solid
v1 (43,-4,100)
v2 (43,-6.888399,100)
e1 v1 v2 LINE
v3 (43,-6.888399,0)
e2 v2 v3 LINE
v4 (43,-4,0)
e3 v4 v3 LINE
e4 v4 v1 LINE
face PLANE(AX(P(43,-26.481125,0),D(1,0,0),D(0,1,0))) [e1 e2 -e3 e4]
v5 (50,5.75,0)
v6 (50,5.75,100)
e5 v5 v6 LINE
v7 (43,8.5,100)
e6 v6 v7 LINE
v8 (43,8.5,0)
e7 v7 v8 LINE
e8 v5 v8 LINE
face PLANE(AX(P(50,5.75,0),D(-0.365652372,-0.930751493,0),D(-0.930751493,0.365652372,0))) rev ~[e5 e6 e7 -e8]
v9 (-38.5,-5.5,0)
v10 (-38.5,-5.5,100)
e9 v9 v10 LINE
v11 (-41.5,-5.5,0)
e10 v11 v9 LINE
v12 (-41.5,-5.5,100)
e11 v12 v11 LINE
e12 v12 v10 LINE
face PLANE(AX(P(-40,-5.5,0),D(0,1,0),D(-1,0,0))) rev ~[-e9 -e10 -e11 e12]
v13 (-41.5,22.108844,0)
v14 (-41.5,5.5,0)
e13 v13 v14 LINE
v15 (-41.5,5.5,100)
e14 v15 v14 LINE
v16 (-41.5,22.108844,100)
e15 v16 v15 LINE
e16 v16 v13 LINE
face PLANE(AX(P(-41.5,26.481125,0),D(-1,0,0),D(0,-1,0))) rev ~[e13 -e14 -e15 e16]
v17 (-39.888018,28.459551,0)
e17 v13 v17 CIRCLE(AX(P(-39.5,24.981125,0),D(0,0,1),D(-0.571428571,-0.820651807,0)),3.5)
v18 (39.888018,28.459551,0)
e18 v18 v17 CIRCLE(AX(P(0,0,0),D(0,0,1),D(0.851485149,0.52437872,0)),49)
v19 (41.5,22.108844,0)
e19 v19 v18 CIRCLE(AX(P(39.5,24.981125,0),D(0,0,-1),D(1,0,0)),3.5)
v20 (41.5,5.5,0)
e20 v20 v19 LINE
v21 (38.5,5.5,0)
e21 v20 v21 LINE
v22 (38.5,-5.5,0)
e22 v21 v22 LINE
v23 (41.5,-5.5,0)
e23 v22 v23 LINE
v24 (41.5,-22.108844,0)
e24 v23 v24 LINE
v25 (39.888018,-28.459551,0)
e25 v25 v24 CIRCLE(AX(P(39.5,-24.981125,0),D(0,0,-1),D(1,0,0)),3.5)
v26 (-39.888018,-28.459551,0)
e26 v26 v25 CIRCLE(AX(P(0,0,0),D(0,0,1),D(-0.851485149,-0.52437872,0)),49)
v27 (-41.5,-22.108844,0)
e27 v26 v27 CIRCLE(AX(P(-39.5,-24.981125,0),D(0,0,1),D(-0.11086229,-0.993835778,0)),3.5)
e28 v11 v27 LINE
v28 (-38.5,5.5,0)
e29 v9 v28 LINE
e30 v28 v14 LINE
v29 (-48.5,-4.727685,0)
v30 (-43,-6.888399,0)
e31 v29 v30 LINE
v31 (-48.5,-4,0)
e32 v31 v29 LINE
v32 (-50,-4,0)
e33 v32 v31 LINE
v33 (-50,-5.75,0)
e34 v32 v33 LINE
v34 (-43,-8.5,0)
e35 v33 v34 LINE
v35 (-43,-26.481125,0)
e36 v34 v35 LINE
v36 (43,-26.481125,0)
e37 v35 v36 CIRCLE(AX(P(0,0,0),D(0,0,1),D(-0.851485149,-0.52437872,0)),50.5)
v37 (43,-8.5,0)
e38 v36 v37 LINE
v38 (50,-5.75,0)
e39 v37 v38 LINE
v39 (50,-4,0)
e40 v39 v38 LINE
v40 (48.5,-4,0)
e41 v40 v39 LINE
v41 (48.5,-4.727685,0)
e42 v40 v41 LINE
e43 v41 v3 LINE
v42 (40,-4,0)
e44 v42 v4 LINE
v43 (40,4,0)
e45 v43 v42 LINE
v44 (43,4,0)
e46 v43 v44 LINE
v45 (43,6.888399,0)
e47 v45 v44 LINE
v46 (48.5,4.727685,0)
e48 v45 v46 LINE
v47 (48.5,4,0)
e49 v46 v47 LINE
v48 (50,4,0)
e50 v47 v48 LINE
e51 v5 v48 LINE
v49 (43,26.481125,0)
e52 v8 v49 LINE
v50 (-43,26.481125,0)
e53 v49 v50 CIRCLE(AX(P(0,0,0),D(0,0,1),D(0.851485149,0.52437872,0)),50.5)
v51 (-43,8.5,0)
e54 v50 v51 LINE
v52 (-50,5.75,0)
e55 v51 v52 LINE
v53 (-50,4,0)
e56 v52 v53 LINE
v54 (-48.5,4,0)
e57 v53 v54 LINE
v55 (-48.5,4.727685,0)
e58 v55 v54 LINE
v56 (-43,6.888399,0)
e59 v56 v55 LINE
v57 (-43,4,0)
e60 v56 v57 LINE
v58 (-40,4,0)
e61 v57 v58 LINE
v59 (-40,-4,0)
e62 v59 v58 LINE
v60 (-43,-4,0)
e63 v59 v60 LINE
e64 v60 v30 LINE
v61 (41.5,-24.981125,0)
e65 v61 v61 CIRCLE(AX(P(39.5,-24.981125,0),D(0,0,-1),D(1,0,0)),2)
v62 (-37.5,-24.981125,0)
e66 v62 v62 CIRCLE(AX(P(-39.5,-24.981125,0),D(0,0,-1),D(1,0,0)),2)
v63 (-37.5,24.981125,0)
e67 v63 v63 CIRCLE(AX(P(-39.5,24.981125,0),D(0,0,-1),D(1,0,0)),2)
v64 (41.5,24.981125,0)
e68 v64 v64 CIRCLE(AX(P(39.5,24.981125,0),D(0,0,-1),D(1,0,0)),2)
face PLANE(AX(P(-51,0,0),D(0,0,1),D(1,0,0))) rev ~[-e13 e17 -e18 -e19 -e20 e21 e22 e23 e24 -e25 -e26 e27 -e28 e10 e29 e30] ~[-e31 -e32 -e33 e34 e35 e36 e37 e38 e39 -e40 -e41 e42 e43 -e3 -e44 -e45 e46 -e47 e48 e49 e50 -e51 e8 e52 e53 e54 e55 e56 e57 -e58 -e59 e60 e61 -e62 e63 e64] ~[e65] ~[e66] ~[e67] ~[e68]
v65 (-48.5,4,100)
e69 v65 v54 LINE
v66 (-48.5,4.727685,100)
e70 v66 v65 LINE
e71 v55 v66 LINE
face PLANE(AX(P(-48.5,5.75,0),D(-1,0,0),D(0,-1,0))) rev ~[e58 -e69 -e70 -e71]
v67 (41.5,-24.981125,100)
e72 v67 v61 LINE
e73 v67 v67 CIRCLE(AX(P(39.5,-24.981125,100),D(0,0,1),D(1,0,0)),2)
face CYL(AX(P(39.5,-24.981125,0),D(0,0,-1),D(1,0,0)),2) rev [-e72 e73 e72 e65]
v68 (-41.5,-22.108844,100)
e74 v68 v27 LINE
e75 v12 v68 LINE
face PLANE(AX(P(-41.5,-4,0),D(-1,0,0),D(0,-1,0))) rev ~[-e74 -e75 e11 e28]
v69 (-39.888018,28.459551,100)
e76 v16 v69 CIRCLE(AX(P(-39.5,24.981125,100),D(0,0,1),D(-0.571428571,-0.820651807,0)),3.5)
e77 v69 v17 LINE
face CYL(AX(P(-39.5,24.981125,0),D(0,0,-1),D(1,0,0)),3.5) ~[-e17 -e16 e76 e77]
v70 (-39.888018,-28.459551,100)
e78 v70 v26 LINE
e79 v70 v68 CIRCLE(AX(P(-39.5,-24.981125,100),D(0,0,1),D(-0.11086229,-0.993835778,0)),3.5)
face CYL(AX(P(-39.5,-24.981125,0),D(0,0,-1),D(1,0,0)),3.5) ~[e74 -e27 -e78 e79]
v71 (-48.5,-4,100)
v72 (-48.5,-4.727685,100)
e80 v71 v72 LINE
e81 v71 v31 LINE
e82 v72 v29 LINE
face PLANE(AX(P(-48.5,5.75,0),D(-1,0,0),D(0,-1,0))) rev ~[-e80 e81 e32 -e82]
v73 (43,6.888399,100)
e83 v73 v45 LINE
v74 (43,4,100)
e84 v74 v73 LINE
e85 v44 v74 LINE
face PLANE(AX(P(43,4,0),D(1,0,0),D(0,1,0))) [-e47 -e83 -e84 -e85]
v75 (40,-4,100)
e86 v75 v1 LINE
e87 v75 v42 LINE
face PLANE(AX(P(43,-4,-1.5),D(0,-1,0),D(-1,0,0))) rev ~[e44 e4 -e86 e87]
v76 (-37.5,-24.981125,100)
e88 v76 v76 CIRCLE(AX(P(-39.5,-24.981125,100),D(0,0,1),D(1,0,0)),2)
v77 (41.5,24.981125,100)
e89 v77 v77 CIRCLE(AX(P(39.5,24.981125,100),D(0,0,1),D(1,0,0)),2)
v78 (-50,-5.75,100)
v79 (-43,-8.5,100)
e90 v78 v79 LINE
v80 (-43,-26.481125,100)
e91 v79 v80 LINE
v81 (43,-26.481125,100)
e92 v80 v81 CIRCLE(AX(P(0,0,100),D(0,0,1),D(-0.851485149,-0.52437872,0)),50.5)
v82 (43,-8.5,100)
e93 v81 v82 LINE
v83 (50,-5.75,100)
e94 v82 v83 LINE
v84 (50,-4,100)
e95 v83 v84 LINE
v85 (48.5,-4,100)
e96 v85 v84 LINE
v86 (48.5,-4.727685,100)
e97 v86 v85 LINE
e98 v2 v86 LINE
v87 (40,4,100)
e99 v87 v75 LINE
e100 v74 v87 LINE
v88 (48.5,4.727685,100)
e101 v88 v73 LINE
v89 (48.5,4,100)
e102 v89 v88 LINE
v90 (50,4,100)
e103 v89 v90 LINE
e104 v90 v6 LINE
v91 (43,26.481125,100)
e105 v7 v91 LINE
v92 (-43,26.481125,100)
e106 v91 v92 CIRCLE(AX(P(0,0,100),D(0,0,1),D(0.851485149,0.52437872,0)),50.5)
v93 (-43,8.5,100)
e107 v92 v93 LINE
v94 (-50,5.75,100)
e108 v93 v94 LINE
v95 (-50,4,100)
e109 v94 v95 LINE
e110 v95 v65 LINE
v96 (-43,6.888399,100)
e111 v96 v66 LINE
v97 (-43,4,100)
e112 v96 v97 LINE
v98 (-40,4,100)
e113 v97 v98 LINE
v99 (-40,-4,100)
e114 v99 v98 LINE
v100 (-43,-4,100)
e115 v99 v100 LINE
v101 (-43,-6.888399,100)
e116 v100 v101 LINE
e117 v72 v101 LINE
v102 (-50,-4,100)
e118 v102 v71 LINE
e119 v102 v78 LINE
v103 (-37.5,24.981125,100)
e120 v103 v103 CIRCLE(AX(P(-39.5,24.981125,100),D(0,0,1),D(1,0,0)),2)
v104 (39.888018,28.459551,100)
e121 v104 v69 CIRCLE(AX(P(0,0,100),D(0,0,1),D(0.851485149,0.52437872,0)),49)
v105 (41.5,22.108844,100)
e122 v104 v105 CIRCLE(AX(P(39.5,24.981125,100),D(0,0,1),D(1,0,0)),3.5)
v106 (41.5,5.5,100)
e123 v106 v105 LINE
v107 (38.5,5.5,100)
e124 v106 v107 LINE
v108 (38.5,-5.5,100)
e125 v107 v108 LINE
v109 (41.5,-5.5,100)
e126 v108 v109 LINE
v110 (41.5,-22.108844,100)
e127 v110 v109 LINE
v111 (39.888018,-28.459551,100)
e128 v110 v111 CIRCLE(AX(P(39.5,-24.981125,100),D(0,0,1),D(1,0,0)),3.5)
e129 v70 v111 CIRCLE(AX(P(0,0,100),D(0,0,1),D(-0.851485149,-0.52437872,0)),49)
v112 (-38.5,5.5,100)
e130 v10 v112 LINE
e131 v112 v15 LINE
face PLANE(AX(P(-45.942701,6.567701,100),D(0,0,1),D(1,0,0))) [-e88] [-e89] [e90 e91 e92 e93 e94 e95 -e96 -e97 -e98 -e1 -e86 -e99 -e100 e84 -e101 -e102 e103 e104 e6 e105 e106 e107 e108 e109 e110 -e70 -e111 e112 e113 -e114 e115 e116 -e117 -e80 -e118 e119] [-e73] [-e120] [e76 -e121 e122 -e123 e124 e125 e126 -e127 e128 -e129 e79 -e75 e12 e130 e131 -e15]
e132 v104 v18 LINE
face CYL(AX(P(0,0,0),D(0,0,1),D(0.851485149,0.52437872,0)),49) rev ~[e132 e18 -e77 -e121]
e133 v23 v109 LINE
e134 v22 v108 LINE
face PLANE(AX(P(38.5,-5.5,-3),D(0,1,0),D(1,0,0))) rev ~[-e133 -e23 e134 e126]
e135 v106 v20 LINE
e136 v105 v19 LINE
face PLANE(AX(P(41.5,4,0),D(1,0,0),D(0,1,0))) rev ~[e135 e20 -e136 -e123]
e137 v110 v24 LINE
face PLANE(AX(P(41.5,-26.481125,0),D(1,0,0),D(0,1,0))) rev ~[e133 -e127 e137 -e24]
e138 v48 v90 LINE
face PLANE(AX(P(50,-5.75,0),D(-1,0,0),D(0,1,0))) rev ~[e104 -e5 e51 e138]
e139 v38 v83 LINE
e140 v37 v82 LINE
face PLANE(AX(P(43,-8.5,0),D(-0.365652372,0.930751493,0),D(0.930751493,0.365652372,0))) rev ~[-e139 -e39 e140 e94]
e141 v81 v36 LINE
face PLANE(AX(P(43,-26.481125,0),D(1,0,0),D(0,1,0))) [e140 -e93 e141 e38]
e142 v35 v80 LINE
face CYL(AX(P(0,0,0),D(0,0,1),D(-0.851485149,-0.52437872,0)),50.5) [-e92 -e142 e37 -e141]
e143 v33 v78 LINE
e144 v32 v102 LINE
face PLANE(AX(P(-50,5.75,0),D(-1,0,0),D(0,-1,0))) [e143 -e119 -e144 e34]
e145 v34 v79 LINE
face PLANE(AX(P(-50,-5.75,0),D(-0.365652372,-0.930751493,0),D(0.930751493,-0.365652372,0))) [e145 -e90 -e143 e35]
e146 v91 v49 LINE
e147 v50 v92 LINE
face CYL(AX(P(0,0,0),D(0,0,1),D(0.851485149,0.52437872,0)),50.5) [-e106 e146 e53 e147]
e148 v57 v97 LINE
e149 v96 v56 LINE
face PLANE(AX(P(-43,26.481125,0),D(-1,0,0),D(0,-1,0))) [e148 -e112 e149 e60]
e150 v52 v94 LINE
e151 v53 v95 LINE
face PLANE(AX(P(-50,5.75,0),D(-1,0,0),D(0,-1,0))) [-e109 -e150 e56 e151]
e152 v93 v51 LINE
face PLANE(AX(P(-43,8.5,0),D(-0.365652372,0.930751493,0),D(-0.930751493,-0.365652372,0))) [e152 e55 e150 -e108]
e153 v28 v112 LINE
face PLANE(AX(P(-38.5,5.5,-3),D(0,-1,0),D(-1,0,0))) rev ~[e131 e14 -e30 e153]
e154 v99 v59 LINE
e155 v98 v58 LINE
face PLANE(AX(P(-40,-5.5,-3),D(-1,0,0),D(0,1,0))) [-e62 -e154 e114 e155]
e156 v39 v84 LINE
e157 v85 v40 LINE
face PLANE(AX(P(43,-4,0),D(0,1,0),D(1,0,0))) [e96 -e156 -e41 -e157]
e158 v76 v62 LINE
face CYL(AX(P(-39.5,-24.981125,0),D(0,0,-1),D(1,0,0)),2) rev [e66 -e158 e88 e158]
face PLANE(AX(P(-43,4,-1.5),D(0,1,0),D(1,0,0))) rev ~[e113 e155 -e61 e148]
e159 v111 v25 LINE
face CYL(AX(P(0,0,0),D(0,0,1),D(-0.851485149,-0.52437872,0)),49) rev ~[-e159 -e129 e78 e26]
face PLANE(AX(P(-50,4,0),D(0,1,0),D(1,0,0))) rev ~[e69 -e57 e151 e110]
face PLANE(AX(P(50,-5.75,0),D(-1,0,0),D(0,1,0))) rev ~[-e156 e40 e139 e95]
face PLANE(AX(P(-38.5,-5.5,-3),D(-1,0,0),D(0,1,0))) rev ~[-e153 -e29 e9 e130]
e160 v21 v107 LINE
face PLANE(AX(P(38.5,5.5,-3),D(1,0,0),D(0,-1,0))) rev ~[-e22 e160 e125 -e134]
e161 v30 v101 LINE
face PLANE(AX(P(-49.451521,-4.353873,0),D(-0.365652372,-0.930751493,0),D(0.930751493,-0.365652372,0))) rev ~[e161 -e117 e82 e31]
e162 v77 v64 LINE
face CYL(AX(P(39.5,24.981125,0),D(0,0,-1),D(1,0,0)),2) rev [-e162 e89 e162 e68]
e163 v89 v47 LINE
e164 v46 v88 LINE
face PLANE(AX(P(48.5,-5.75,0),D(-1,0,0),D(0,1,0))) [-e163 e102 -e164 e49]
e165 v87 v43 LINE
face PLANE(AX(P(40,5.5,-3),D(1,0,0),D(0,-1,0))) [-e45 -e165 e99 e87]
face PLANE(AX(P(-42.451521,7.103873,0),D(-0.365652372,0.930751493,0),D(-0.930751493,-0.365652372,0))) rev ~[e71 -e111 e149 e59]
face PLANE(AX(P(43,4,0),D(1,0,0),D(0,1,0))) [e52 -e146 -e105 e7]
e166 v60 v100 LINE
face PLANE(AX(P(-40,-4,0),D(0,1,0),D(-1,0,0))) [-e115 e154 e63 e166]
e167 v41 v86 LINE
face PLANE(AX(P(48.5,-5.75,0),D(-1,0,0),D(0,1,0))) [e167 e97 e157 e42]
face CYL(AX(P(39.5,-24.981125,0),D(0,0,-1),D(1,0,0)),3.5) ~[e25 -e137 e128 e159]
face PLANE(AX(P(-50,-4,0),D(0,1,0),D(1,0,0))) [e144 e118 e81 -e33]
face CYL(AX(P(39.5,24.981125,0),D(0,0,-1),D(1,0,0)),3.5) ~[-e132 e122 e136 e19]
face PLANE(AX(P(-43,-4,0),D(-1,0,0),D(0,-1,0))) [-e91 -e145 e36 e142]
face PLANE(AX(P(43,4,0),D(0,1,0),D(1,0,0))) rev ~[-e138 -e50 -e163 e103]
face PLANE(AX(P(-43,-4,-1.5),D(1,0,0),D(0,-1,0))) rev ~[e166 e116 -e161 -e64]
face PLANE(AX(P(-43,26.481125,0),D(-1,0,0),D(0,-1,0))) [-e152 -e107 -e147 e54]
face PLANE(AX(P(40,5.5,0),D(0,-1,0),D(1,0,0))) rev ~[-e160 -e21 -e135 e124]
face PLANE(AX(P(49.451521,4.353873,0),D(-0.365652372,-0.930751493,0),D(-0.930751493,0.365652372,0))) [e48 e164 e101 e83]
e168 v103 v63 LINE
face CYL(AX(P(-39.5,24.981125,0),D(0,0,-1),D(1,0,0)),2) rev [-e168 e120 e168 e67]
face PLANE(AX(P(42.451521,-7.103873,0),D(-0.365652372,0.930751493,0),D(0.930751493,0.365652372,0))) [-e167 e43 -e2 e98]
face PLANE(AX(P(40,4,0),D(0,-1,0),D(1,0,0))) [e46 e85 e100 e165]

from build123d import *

# Parameters (mm, degrees)
F0_R          = 2
F1_DEPTH      = 100
F1_DEPTH_BACK = 1.5
F2_T          = 1.5
F2_T3_DEPTH   = 104.5
F0_W          = 7
F0_H          = 1.75
F0_H_2        = 8
F0_W_2        = 3
F3_DEPTH      = 100
F3_DEPTH_BACK = 1.5
F4_T          = 1.5
F4_T3_DEPTH   = 104.5
F4_T5_DEPTH   = 103
F4_T7_DEPTH   = 19.6088440305
F4_T9_DEPTH   = 6
F4_T11_DEPTH  = 14
F4_T13_DEPTH  = 19.6088440305
F4_T15_DEPTH  = 6
F4_T18_ANGLE  = 221.2149297422
F4_T20_ANGLE  = 108.9853327241
F4_T22_ANGLE  = 221.2149297422
F4_T24_ANGLE  = 221.2149297422
F4_T26_ANGLE  = 108.9853327241
F4_T28_ANGLE  = 221.2149297422
F0_W_3        = 2
F5_DEPTH      = 1.5
F6_DEPTH      = 100
F6_DEPTH_BACK = 1.5


# Not quite as in the source:
# - a shell that OpenCascade refuses in one call is made with other operations: the cavity is built on its own and cut out


with BuildPart() as f1:
    # F0 (on Top) → F1 (new body, two sides)
    with BuildSketch(Plane.XY) as f1_sk:
        with BuildLine():
            Line((43, 8.5), (43, 26.4811253537))
            ThreePointArc((43, 26.4811253537), (0, 50.5), (-43, 26.4811253537))
            Line((-43, 26.4811253537), (-43, 8.5))
            Line((-43, 8.5), (-43, 5.75))
            Line((-43, 5.75), (-43, 4))
            Line((-43, 4), (-40, 4))
            Line((-40, 4), (-40, -4))
            Line((-40, -4), (-43, -4))
            Line((-43, -4), (-43, -5.75))
            Line((-43, -5.75), (-43, -8.5))
            Line((-43, -8.5), (-43, -26.4811253537))
            ThreePointArc((-43, -26.4811253537), (0, -50.5), (43, -26.4811253537))
            Line((43, -26.4811253537), (43, -8.5))
            Line((43, -8.5), (43, -5.75))
            Line((43, -5.75), (43, -4))
            Line((43, -4), (40, -4))
            Line((40, -4), (40, 4))
            Line((40, 4), (43, 4))
            Line((43, 4), (43, 5.75))
            Line((43, 5.75), (43, 8.5))
        make_face()
        with Locations((-39.5, -24.9811253537)):
            Circle(F0_R, mode=Mode.SUBTRACT)
        with Locations((39.5, -24.9811253537)):
            Circle(F0_R, mode=Mode.SUBTRACT)
        with Locations((-39.5, 24.9811253537)):
            Circle(F0_R, mode=Mode.SUBTRACT)
        with Locations((39.5, 24.9811253537)):
            Circle(F0_R, mode=Mode.SUBTRACT)
    extrude(amount=F1_DEPTH)
    extrude(f1_sk.sketch, amount=-F1_DEPTH_BACK)

    # F2: shell of thickness 1.5, made by hand


with BuildPart() as f2_core1:
    # F2_t2: copy of F1
    add(f1.part)

    # the walls: a layer under each face that stays
    f2_faces = [f2_core1.faces().sort_by_distance(p)[0] for p in [
        (43, -15.2405626769, 49.25),
        (0, 0, -1.5),
        (37.5, 24.9811253537, 49.25),
        (-41.5, 24.9811253537, 49.25),
        (37.5, -24.9811253537, 49.25),
        (-41.5, -24.9811253537, 49.25),
        (-43, -15.2405626769, 49.25),
        (-41.5, -4, 49.25),
        (-40, 0, 49.25),
        (-41.5, 4, 49.25),
        (-43, 15.2405626769, 49.25),
        (0, 50.5, 49.25),
        (43, 15.2405626769, 49.25),
        (41.5, 4, 49.25),
        (40, 0, 49.25),
        (41.5, -4, 49.25),
        (0, -50.5, 49.25),
    ]]
    thicken(f2_faces, amount=-F2_T, mode=Mode.SUBTRACT)

    # F2_s4 → F2_t3 (cut)
    with BuildSketch(Plane.XY.offset(-3)):
        Polygon((-40.015, -3.985), (-40, -5.5), (-38.5, -5.5), (-38.5, -4), align=None)
        Polygon((-40.015, 3.985), (-38.5, 4), (-38.5, 5.5), (-40, 5.5), align=None)
        Polygon((40.015, 3.985), (40, 5.5), (38.5, 5.5), (38.5, 4), align=None)
        Polygon((40.015, -3.985), (38.5, -4), (38.5, -5.5), (40, -5.5), align=None)
    extrude(amount=F2_T3_DEPTH, mode=Mode.SUBTRACT)


with BuildPart() as f1_1:
    add(f1.part)

    # what is left inside the walls is the cavity
    f2_cavity = [f2_core1.part.solids().sort_by_distance(p)[0] for p in [
        (0, -48.985, 66.666667),
    ]]
    add(f2_cavity, mode=Mode.SUBTRACT)

    # F0 (on Top) → F3 (join, two sides)
    with BuildSketch(Plane.XY) as f3_sk:
        Polygon((-43, 5.75), (-43, 8.5), (-50, 5.75), align=None)
        with Locations((-46.5, 4.875)):
            Rectangle(F0_W, F0_H)
        with Locations((-46.5, 0)):
            Rectangle(F0_W, F0_H_2)
        with Locations((-46.5, -4.875)):
            Rectangle(F0_W, F0_H)
        Polygon((-43, -8.5), (-43, -5.75), (-50, -5.75), align=None)
        with Locations((-41.5, 0)):
            Rectangle(F0_W_2, F0_H_2)
        Polygon((50, -5.75), (43, -5.75), (43, -8.5), align=None)
        with Locations((46.5, -4.875)):
            Rectangle(F0_W, F0_H)
        with Locations((46.5, 0)):
            Rectangle(F0_W, F0_H_2)
        with Locations((41.5, 0)):
            Rectangle(F0_W_2, F0_H_2)
        Polygon((50, 5.75), (43, 8.5), (43, 5.75), align=None)
        with Locations((46.5, 4.875)):
            Rectangle(F0_W, F0_H)
    extrude(amount=F3_DEPTH)
    extrude(f3_sk.sketch, amount=-F3_DEPTH_BACK)

    # F4: shell of thickness 1.5, made by hand


with BuildPart() as f4_core1:
    # F4_t2: copy of F1
    add(f1_1.part)

    # the walls: a layer under each face that stays
    f4_faces = [f4_core1.faces().sort_by_distance(p)[0] for p in [
        (43, -17.4905626769, 49.25),
        (0, -50.5, 49.25),
        (0, 0, -1.5),
        (46.5, -7.125, 49.25),
        (-43, -17.4905626769, 49.25),
        (43, 17.4905626769, 49.25),
        (0, 50.5, 49.25),
        (-43, 17.4905626769, 49.25),
        (-41.5, -24.9811253537, 49.25),
        (37.5, -24.9811253537, 49.25),
        (-41.5, 24.9811253537, 49.25),
        (37.5, 24.9811253537, 49.25),
        (50, 0, 49.25),
        (41.5, -13.8044220152, 50),
        (40, -5.5, 50),
        (38.5, 0, 50),
        (40, 5.5, 50),
        (41.5, 13.8044220152, 50),
        (36.1075781641, 24.1200364574, 50),
        (0, 49, 50),
        (-36.1075781641, 24.1200364574, 50),
        (-41.5, 13.8044220152, 50),
        (-40, 5.5, 50),
        (-38.5, 0, 50),
        (-40, -5.5, 50),
        (-41.5, -13.8044220152, 50),
        (-36.1075781641, -24.1200364574, 50),
        (0, -49, 50),
        (36.1075781641, -24.1200364574, 50),
        (-46.5, -7.125, 49.25),
        (46.5, 7.125, 49.25),
        (-46.5, 7.125, 49.25),
        (-50, 0, 49.25),
        (0, 0, 0),
    ]]
    thicken(f4_faces, amount=-F4_T, mode=Mode.SUBTRACT)

    # F4_s4 → F4_t3 (cut)
    with BuildSketch(Plane.XY.offset(-3)):
        Polygon((43.0204847856, -8.5139612724), (41.5, -8.5), (41.5, -7.4776847547), (42.4515214414, -7.1038727598), align=None)
        Polygon((-43.0204847856, -8.5139612724), (-41.5, -8.5), (-41.5, -7.4776847547), (-42.4515214414, -7.1038727598), align=None)
        Polygon((43.0204847856, 8.5139612724), (41.5, 8.5), (41.5, 7.4776847547), (42.4515214414, 7.1038727598), align=None)
        Polygon((-43.0204847856, 8.5139612724), (-41.5, 8.5), (-41.5, 7.4776847547), (-42.4515214414, 7.1038727598), align=None)
    extrude(amount=F4_T3_DEPTH, mode=Mode.SUBTRACT)

    # F4_s6 → F4_t5 (cut)
    with BuildSketch(Plane.XY.offset(-1.5)):
        Polygon((41.4935714286, -22.0965342534), (43, -22.1088440305), (43, -24.9811253537), (40.6428571429, -23.3398217404), align=None)
        Polygon((41.485, -5.515), (43, -5.5), (43, -4), (41.5, -4), align=None)
        Polygon((41.485, 5.515), (41.5, 4), (43, 4), (43, 5.5), align=None)
        Polygon((41.4935714286, 22.0965342534), (43, 22.1088440305), (43, 24.9811253537), (40.6428571429, 23.3398217404), align=None)
        Polygon((39.8774703303, 28.4657460045), (39.7217245792, 26.9687969088), (43.0599998648, 26.5964126076), (41.1090797896, 29.330761307), align=None)
        Polygon((-39.8774703303, 28.4657460045), (-41.1090797896, 29.330761307), (-43.0599998648, 26.5964126076), (-39.7217245792, 26.9687969088), align=None)
        Polygon((-41.4935714286, 22.0965342534), (-40.6428571429, 23.3398217404), (-43, 24.9811253537), (-43, 22.1088440305), align=None)
        Polygon((-41.485, 5.515), (-43, 5.5), (-43, 4), (-41.5, 4), align=None)
        Polygon((-41.485, -5.515), (-41.5, -4), (-43, -4), (-43, -5.5), align=None)
        Polygon((-41.4935714286, -22.0965342534), (-43, -22.1088440305), (-43, -24.9811253537), (-40.6428571429, -23.3398217404), align=None)
        Polygon((-39.8774703303, -28.4657460045), (-39.7217245792, -26.9687969088), (-43.0599998648, -26.5964126076), (-41.1090797896, -29.330761307), align=None)
        Polygon((39.8774703303, -28.4657460045), (41.1090797896, -29.330761307), (43.0599998648, -26.5964126076), (39.7217245792, -26.9687969088), align=None)
    extrude(amount=F4_T5_DEPTH, mode=Mode.SUBTRACT)

    # F4_s8 → F4_t7 (cut)
    with BuildSketch(Plane.XZ.offset(4)):
        Polygon((41.485, 0.015), (43, 0), (43, -1.5), (41.5, -1.5), align=None)
        Polygon((-41.485, 0.015), (-43, 0), (-43, -1.5), (-41.5, -1.5), align=None)
    extrude(amount=F4_T7_DEPTH, mode=Mode.SUBTRACT)

    # F4_s10 → F4_t9 (cut)
    with BuildSketch(Plane.YZ.offset(37)):
        Polygon((-5.515, 0.015), (-4, 0), (-4, -1.5), (-5.5, -1.5), align=None)
        Polygon((5.515, 0.015), (4, 0), (4, -1.5), (5.5, -1.5), align=None)
    extrude(amount=F4_T9_DEPTH, mode=Mode.SUBTRACT)

    # F4_s12 → F4_t11 (cut)
    with BuildSketch(Plane.XZ.offset(-7)):
        Polygon((38.485, 0.015), (40, 0), (40, -1.5), (38.5, -1.5), align=None)
        Polygon((-38.485, 0.015), (-40, 0), (-40, -1.5), (-38.5, -1.5), align=None)
    extrude(amount=F4_T11_DEPTH, mode=Mode.SUBTRACT)

    # F4_s14 → F4_t13 (cut)
    with BuildSketch(Plane.XZ.offset(-23.6088440305)):
        Polygon((41.485, 0.015), (43, 0), (43, -1.5), (41.5, -1.5), align=None)
        Polygon((-41.485, 0.015), (-43, 0), (-43, -1.5), (-41.5, -1.5), align=None)
    extrude(amount=F4_T13_DEPTH, mode=Mode.SUBTRACT)

    # F4_s16 → F4_t15 (cut)
    with BuildSketch(Plane.YZ.offset(-43)):
        Polygon((5.515, 0.015), (4, 0), (4, -1.5), (5.5, -1.5), align=None)
        Polygon((-5.515, 0.015), (-4, 0), (-4, -1.5), (-5.5, -1.5), align=None)
    extrude(amount=F4_T15_DEPTH, mode=Mode.SUBTRACT)

    # F4_s17 → F4_t18 (revolve, cut)
    with BuildSketch(Plane(origin=(38.3167869041, 26.6803857921, 0), x_dir=(0, 0, 1), z_dir=(0.8206518066, 0.5714285714, 0))):
        Polygon((0.015, 5.5856229178), (0, 4.0706229178), (-1.5, 4.0706229178), (-1.5, 5.5706229178), align=None)
    revolve(axis=Axis((39.5, 24.9811253537, 0), (0, 0, -1)), revolution_arc=F4_T18_ANGLE, mode=Mode.SUBTRACT)

    # F4_s19 → F4_t20 (revolve, cut)
    with BuildSketch(Plane(origin=(0, 0, 0), x_dir=(0, 0, 1), z_dir=(-0.5808071546, -0.814041184, 0))):
        Polygon((0.015, 48.985), (0, 50.5), (-1.5, 50.5), (-1.5, 49), align=None)
    revolve(axis=Axis((0, 0, 0), (0, 0, -1)), revolution_arc=F4_T20_ANGLE, mode=Mode.SUBTRACT)

    # F4_s21 → F4_t22 (revolve, cut)
    with BuildSketch(Plane(origin=(-38.3167869041, 26.6803857921, 0), x_dir=(0, 0, 1), z_dir=(-0.8206518066, 0.5714285714, 0))):
        Polygon((0.015, -5.5856229178), (0, -4.0706229178), (-1.5, -4.0706229178), (-1.5, -5.5706229178), align=None)
    revolve(axis=Axis((-39.5, 24.9811253537, 0), (0, 0, 1)), revolution_arc=F4_T22_ANGLE, mode=Mode.SUBTRACT)

    # F4_s23 → F4_t24 (revolve, cut)
    with BuildSketch(Plane(origin=(-36.2621341759, 4.0450377338, 0), x_dir=(0, 0, 1), z_dir=(-0.9938357776, 0.1108622896, 0))):
        Polygon((0.015, -32.7211965802), (0, -31.2061965802), (-1.5, -31.2061965802), (-1.5, -32.7061965802), align=None)
    revolve(axis=Axis((-39.5, -24.9811253537, 0), (0, 0, 1)), revolution_arc=F4_T24_ANGLE, mode=Mode.SUBTRACT)

    # F4_s25 → F4_t26 (revolve, cut)
    with BuildSketch(Plane(origin=(0, 0, 0), x_dir=(0, 0, 1), z_dir=(0.5808071546, 0.814041184, 0))):
        Polygon((0.015, 48.985), (0, 50.5), (-1.5, 50.5), (-1.5, 49), align=None)
    revolve(axis=Axis((0, 0, 0), (0, 0, -1)), revolution_arc=F4_T26_ANGLE, mode=Mode.SUBTRACT)

    # F4_s27 → F4_t28 (revolve, cut)
    with BuildSketch(Plane(origin=(36.2621341759, 4.0450377338, 0), x_dir=(0, 0, 1), z_dir=(0.9938357776, 0.1108622896, 0))):
        Polygon((0.015, 32.7211965802), (0, 31.2061965802), (-1.5, 31.2061965802), (-1.5, 32.7061965802), align=None)
    revolve(axis=Axis((39.5, -24.9811253537, 0), (0, 0, -1)), revolution_arc=F4_T28_ANGLE, mode=Mode.SUBTRACT)


with BuildPart() as f1_2:
    add(f1_1.part)

    # what is left inside the walls is the cavity
    f4_cavity = [f4_core1.part.solids().sort_by_distance(p)[0] for p in [
        (48.485, 0, 66.666667),
        (-48.485, 0, 66.666667),
    ]]
    add(f4_cavity, mode=Mode.SUBTRACT)

    # F0 (on Top) → F5 (cut)
    with BuildSketch(Plane.XY):
        with Locations((-51, 0)):
            Rectangle(F0_W_3, F0_H_2)
        with Locations((-46.5, 0)):
            Rectangle(F0_W, F0_H_2)
        with Locations((-46.5, 4.875)):
            Rectangle(F0_W, F0_H)
        Polygon((-43, 5.75), (-43, 8.5), (-50, 5.75), align=None)
        with Locations((-41.5, 0)):
            Rectangle(F0_W_2, F0_H_2)
        Polygon((-43, -8.5), (-43, -5.75), (-50, -5.75), align=None)
        with BuildLine():
            Line((43, 8.5), (43, 26.4811253537))
            ThreePointArc((43, 26.4811253537), (0, 50.5), (-43, 26.4811253537))
            Line((-43, 26.4811253537), (-43, 8.5))
            Line((-43, 8.5), (-43, 5.75))
            Line((-43, 5.75), (-43, 4))
            Line((-43, 4), (-40, 4))
            Line((-40, 4), (-40, -4))
            Line((-40, -4), (-43, -4))
            Line((-43, -4), (-43, -5.75))
            Line((-43, -5.75), (-43, -8.5))
            Line((-43, -8.5), (-43, -26.4811253537))
            ThreePointArc((-43, -26.4811253537), (0, -50.5), (43, -26.4811253537))
            Line((43, -26.4811253537), (43, -8.5))
            Line((43, -8.5), (43, -5.75))
            Line((43, -5.75), (43, -4))
            Line((43, -4), (40, -4))
            Line((40, -4), (40, 4))
            Line((40, 4), (43, 4))
            Line((43, 4), (43, 5.75))
            Line((43, 5.75), (43, 8.5))
        make_face()
        with Locations((-39.5, -24.9811253537)):
            Circle(F0_R, mode=Mode.SUBTRACT)
        with Locations((39.5, -24.9811253537)):
            Circle(F0_R, mode=Mode.SUBTRACT)
        with Locations((-39.5, 24.9811253537)):
            Circle(F0_R, mode=Mode.SUBTRACT)
        with Locations((39.5, 24.9811253537)):
            Circle(F0_R, mode=Mode.SUBTRACT)
        with Locations((41.5, 0)):
            Rectangle(F0_W_2, F0_H_2)
        with Locations((46.5, 0)):
            Rectangle(F0_W, F0_H_2)
        with Locations((46.5, 4.875)):
            Rectangle(F0_W, F0_H)
        Polygon((50, 5.75), (43, 8.5), (43, 5.75), align=None)
        Polygon((50, -5.75), (43, -5.75), (43, -8.5), align=None)
        with Locations((46.5, -4.875)):
            Rectangle(F0_W, F0_H)
        with Locations((51, 0)):
            Rectangle(F0_W_3, F0_H_2)
        with Locations((-46.5, -4.875)):
            Rectangle(F0_W, F0_H)
        with Locations((-39.5, 24.9811253537)):
            Circle(F0_R)
        with Locations((39.5, 24.9811253537)):
            Circle(F0_R)
        with Locations((39.5, -24.9811253537)):
            Circle(F0_R)
        with Locations((-39.5, -24.9811253537)):
            Circle(F0_R)
    extrude(amount=-F5_DEPTH, mode=Mode.SUBTRACT)

    # F0 (on Top) → F6 (cut, two sides)
    with BuildSketch(Plane.XY) as f6_sk:
        with Locations((-46.5, 0)):
            Rectangle(F0_W, F0_H_2)
        with Locations((46.5, 0)):
            Rectangle(F0_W, F0_H_2)
    extrude(amount=F6_DEPTH, mode=Mode.SUBTRACT)
    extrude(f6_sk.sketch, amount=-F6_DEPTH_BACK, mode=Mode.SUBTRACT)


solid = f1_2.part
